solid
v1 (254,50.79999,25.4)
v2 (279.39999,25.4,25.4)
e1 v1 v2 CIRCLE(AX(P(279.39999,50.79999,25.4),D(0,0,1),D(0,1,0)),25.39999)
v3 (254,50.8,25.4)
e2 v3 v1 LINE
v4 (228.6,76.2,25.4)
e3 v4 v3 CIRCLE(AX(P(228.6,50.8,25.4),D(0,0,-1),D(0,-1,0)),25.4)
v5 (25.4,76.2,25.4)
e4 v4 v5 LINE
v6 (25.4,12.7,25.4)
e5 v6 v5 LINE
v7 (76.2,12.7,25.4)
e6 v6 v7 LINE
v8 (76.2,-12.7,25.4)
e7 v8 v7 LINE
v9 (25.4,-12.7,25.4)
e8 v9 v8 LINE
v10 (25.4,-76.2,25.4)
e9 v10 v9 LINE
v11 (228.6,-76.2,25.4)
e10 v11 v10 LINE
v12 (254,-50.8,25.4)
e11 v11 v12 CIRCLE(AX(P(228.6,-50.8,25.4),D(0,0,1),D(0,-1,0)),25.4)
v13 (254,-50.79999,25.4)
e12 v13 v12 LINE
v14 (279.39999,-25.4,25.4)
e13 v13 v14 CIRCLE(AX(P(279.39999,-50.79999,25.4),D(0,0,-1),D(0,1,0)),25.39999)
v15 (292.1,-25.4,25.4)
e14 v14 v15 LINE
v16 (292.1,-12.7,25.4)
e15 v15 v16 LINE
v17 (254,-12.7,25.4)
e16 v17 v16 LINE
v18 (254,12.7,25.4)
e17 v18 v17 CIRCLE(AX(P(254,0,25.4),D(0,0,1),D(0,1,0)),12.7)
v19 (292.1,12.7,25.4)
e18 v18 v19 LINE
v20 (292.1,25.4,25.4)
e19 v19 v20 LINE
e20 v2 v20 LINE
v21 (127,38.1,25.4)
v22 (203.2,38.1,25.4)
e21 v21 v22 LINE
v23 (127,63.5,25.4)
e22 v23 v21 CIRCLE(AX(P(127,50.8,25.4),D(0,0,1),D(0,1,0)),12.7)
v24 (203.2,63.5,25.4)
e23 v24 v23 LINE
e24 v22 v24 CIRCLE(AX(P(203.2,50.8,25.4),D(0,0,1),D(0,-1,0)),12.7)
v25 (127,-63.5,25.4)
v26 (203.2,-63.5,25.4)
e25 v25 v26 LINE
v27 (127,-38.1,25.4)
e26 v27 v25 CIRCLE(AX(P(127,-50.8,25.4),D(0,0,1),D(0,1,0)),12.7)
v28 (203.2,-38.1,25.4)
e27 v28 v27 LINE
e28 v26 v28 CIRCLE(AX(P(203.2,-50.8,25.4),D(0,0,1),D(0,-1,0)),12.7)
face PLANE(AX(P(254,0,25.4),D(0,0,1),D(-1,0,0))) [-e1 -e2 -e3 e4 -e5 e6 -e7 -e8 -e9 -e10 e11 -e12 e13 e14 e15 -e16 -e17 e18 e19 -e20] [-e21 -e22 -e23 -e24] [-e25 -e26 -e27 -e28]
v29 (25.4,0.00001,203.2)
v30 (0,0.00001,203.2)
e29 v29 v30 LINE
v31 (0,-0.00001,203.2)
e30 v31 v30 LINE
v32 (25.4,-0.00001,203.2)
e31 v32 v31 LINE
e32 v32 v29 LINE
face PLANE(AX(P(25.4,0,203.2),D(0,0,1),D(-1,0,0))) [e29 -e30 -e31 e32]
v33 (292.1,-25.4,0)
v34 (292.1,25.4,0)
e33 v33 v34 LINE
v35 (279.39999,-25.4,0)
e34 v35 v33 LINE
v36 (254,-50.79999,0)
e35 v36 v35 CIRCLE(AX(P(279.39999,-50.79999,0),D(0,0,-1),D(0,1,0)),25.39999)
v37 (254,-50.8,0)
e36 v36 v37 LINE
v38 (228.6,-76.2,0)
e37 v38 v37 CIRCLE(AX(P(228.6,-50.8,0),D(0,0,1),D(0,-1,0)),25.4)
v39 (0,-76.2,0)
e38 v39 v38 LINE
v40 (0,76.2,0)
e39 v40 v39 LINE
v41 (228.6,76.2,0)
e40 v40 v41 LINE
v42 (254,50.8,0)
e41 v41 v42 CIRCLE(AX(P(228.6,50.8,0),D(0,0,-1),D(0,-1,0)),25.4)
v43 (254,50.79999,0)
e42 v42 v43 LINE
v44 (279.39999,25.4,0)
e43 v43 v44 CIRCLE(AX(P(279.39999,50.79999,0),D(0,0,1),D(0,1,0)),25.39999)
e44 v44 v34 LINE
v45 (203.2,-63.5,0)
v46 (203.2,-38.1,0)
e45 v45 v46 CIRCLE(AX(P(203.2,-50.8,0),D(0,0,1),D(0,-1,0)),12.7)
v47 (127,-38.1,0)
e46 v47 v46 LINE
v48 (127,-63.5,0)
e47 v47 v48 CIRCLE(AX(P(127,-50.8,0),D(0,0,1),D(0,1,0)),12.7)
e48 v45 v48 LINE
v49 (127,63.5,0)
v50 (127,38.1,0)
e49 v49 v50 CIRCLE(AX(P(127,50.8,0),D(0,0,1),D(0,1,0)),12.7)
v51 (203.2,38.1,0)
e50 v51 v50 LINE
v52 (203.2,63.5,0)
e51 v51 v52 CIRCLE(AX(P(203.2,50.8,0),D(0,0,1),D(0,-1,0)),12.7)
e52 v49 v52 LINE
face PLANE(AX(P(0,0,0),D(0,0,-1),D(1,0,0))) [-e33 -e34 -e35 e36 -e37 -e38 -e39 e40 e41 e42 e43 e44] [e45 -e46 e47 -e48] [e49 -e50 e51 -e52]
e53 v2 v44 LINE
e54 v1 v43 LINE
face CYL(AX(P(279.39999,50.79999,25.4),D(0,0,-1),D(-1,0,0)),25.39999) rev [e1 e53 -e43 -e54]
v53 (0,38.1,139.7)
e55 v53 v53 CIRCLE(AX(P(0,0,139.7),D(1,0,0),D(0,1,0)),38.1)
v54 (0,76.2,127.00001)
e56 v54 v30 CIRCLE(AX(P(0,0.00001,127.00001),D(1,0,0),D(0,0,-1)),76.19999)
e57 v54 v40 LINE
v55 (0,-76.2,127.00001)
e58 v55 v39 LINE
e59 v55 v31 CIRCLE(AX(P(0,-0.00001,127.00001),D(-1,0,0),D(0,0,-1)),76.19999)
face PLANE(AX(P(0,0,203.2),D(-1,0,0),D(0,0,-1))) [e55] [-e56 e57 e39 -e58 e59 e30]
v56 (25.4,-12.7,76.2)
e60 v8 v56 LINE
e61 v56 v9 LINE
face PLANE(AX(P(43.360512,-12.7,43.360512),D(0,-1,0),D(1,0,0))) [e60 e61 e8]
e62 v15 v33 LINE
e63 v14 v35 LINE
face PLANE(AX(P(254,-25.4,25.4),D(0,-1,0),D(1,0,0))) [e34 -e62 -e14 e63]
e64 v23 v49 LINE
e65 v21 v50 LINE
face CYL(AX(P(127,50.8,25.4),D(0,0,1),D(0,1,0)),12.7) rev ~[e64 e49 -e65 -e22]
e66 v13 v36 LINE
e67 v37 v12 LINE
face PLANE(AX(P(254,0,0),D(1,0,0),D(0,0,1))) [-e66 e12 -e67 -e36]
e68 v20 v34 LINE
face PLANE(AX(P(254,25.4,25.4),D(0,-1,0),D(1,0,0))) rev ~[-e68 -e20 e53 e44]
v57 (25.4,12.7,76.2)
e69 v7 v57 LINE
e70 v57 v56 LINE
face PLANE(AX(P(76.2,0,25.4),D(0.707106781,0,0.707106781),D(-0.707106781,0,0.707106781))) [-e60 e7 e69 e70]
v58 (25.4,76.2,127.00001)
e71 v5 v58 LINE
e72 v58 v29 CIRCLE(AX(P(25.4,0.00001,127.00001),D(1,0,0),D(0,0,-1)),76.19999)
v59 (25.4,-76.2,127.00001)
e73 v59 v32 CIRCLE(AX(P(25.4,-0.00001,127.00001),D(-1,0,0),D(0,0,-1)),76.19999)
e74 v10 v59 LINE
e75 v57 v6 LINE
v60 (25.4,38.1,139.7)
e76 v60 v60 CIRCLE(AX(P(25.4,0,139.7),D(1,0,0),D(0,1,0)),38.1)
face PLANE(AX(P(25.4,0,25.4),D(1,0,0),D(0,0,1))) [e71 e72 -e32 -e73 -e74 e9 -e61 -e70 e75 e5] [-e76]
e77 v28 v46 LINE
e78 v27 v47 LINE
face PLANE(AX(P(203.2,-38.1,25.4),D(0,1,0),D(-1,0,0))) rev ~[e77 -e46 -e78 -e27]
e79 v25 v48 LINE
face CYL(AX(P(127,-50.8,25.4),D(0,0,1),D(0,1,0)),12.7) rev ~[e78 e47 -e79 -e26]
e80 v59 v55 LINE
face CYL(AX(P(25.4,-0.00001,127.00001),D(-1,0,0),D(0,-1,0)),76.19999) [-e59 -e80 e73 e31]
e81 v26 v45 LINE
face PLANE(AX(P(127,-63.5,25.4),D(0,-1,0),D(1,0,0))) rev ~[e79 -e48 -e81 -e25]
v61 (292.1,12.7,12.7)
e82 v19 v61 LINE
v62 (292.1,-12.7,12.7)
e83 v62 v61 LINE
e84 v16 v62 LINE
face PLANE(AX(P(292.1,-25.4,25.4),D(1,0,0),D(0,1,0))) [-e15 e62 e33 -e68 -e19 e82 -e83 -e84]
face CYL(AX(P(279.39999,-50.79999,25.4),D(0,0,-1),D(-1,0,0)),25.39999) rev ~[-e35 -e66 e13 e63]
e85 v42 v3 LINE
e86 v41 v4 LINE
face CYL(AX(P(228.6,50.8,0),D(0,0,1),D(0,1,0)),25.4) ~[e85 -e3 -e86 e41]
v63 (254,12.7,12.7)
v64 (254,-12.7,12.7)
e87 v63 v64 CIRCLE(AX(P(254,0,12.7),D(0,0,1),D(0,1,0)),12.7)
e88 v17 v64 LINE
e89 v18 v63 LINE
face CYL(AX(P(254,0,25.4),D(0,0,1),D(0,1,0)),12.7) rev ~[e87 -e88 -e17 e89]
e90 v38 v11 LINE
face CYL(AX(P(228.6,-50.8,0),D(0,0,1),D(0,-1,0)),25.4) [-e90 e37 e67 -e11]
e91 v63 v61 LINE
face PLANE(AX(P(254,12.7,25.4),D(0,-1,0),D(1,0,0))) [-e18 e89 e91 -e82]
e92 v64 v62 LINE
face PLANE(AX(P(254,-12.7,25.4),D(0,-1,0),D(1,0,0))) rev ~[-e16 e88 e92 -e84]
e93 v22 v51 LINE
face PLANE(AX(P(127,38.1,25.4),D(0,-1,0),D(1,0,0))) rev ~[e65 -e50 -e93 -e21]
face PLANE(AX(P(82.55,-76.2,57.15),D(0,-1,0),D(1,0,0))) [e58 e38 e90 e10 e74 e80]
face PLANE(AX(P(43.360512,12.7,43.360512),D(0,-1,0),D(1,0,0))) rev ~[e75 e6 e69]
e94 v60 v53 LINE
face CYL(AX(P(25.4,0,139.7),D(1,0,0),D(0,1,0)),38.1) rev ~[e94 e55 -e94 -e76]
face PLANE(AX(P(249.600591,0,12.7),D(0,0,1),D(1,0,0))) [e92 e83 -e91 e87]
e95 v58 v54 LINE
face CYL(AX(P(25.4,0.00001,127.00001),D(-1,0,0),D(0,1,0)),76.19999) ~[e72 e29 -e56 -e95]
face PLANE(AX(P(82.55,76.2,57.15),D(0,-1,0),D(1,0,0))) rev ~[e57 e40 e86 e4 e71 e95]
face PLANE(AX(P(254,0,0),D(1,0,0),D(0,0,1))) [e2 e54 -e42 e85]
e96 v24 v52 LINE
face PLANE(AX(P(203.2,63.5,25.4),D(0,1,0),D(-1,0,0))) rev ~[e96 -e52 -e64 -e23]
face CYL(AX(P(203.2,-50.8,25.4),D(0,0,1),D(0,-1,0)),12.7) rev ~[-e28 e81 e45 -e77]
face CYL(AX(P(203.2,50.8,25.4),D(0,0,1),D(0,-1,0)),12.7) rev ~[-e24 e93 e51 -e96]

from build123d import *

# Parameters (mm, degrees)
F1_DEPTH  = 76.2
F2_DEPTH  = 12.7
F3_R      = 76.19999
F6_DEPTH  = 25.401
F7_DEPTH  = 25.401
F5_W      = 38.1
F5_H      = 12.7
F5_H_2    = 25.4
F8_DEPTH  = 25.4
F9_R      = 25.4
F10_R     = 25.39999
F11_DEPTH = 12.7


# Not quite as in the source:
# - a fillet or chamfer is up to 0.001 mm smaller than in the source, because OpenCascade refuses the exact size
# - a feature names something its author has since deleted; it is built from what else it names


with BuildPart() as f1:
    # F0 (on Front) → F1 (new body, symmetric)
    with BuildSketch(Plane.XZ):
        Polygon((0, 203.2), (0, 0), (254, 0), (254, 25.4), (76.2, 25.4), (25.4, 25.4), (25.4, 76.2), (25.4, 203.2), align=None)
    extrude(amount=F1_DEPTH, both=True)

    # F0 (on Front) → F2 (join, symmetric)
    with BuildSketch(Plane.XZ):
        Polygon((76.2, 25.4), (25.4, 76.2), (25.4, 25.4), align=None)
    extrude(amount=F2_DEPTH, both=True)

    # F3 (radius 76.2 in the source; OpenCascade refuses exactly that, so slightly less here)
    f3_edges = [f1.edges().sort_by_distance(p)[0] for p in [
        (12.7, -76.2, 203.2),
        (12.7, 76.2, 203.2),
    ]]
    fillet(f3_edges, radius=F3_R)

    # F5 (on face) → F6 (cut, through all)
    with BuildSketch(Plane.XY.offset(25.4)):
        with BuildLine():
            Line((203.2, 63.5), (127, 63.5))
            ThreePointArc((127, 63.5), (114.3, 50.8), (127, 38.1))
            Line((127, 38.1), (203.2, 38.1))
            ThreePointArc((203.2, 38.1), (215.9, 50.8), (203.2, 63.5))
        make_face()
        with BuildLine():
            Line((203.2, -38.1), (127, -38.1))
            ThreePointArc((127, -38.1), (114.3, -50.8), (127, -63.5))
            Line((127, -63.5), (203.2, -63.5))
            ThreePointArc((203.2, -63.5), (215.9, -50.8), (203.2, -38.1))
        make_face()
    extrude(amount=-F6_DEPTH, mode=Mode.SUBTRACT)

    # F4 (on face) → F7 (cut, through all)
    with BuildSketch(Plane.YZ.offset(25.4)):
        with BuildLine():
            Line((0, 101.6), (0, 177.8))
            ThreePointArc((0, 177.8), (-38.1, 139.7), (0, 101.6))
        make_face()
        with BuildLine():
            ThreePointArc((0, 101.6), (26.9407683632, 112.7592316368), (38.1, 139.7))
            ThreePointArc((38.1, 139.7), (26.9407683632, 166.6407683632), (0, 177.8))
            Line((0, 177.8), (0, 101.6))
        make_face()
    extrude(amount=-F7_DEPTH, mode=Mode.SUBTRACT)

    # F5 (on face) → F8 (join)
    with BuildSketch(Plane.XY.offset(25.4)):
        with Locations((273.05, 19.05)):
            Rectangle(F5_W, F5_H)
        with Locations((273.05, -19.05)):
            Rectangle(F5_W, F5_H)
        with Locations((273.05, 0)):
            Rectangle(F5_W, F5_H_2)
    extrude(amount=-F8_DEPTH)

    # F9
    f9_edges = [f1.edges().sort_by_distance(p)[0] for p in [
        (254, 76.2, 12.7),
        (254, -76.2, 12.7),
    ]]
    fillet(f9_edges, radius=F9_R)

    # F10 (radius 25.4 in the source; OpenCascade refuses exactly that, so slightly less here)
    f10_edges = [f1.edges().sort_by_distance(p)[0] for p in [
        (254, 25.4, 12.7),
        (254, -25.4, 12.7),
    ]]
    fillet(f10_edges, radius=F10_R)

    # F5 (on face) → F11 (cut)
    with BuildSketch(Plane.XY.offset(25.4)):
        with BuildLine():
            Line((254, -12.7), (254, 12.7))
            ThreePointArc((254, 12.7), (241.3, 0), (254, -12.7))
        make_face()
        with Locations((273.05, 0)):
            Rectangle(F5_W, F5_H_2)
    extrude(amount=-F11_DEPTH, mode=Mode.SUBTRACT)


solid = f1.part
